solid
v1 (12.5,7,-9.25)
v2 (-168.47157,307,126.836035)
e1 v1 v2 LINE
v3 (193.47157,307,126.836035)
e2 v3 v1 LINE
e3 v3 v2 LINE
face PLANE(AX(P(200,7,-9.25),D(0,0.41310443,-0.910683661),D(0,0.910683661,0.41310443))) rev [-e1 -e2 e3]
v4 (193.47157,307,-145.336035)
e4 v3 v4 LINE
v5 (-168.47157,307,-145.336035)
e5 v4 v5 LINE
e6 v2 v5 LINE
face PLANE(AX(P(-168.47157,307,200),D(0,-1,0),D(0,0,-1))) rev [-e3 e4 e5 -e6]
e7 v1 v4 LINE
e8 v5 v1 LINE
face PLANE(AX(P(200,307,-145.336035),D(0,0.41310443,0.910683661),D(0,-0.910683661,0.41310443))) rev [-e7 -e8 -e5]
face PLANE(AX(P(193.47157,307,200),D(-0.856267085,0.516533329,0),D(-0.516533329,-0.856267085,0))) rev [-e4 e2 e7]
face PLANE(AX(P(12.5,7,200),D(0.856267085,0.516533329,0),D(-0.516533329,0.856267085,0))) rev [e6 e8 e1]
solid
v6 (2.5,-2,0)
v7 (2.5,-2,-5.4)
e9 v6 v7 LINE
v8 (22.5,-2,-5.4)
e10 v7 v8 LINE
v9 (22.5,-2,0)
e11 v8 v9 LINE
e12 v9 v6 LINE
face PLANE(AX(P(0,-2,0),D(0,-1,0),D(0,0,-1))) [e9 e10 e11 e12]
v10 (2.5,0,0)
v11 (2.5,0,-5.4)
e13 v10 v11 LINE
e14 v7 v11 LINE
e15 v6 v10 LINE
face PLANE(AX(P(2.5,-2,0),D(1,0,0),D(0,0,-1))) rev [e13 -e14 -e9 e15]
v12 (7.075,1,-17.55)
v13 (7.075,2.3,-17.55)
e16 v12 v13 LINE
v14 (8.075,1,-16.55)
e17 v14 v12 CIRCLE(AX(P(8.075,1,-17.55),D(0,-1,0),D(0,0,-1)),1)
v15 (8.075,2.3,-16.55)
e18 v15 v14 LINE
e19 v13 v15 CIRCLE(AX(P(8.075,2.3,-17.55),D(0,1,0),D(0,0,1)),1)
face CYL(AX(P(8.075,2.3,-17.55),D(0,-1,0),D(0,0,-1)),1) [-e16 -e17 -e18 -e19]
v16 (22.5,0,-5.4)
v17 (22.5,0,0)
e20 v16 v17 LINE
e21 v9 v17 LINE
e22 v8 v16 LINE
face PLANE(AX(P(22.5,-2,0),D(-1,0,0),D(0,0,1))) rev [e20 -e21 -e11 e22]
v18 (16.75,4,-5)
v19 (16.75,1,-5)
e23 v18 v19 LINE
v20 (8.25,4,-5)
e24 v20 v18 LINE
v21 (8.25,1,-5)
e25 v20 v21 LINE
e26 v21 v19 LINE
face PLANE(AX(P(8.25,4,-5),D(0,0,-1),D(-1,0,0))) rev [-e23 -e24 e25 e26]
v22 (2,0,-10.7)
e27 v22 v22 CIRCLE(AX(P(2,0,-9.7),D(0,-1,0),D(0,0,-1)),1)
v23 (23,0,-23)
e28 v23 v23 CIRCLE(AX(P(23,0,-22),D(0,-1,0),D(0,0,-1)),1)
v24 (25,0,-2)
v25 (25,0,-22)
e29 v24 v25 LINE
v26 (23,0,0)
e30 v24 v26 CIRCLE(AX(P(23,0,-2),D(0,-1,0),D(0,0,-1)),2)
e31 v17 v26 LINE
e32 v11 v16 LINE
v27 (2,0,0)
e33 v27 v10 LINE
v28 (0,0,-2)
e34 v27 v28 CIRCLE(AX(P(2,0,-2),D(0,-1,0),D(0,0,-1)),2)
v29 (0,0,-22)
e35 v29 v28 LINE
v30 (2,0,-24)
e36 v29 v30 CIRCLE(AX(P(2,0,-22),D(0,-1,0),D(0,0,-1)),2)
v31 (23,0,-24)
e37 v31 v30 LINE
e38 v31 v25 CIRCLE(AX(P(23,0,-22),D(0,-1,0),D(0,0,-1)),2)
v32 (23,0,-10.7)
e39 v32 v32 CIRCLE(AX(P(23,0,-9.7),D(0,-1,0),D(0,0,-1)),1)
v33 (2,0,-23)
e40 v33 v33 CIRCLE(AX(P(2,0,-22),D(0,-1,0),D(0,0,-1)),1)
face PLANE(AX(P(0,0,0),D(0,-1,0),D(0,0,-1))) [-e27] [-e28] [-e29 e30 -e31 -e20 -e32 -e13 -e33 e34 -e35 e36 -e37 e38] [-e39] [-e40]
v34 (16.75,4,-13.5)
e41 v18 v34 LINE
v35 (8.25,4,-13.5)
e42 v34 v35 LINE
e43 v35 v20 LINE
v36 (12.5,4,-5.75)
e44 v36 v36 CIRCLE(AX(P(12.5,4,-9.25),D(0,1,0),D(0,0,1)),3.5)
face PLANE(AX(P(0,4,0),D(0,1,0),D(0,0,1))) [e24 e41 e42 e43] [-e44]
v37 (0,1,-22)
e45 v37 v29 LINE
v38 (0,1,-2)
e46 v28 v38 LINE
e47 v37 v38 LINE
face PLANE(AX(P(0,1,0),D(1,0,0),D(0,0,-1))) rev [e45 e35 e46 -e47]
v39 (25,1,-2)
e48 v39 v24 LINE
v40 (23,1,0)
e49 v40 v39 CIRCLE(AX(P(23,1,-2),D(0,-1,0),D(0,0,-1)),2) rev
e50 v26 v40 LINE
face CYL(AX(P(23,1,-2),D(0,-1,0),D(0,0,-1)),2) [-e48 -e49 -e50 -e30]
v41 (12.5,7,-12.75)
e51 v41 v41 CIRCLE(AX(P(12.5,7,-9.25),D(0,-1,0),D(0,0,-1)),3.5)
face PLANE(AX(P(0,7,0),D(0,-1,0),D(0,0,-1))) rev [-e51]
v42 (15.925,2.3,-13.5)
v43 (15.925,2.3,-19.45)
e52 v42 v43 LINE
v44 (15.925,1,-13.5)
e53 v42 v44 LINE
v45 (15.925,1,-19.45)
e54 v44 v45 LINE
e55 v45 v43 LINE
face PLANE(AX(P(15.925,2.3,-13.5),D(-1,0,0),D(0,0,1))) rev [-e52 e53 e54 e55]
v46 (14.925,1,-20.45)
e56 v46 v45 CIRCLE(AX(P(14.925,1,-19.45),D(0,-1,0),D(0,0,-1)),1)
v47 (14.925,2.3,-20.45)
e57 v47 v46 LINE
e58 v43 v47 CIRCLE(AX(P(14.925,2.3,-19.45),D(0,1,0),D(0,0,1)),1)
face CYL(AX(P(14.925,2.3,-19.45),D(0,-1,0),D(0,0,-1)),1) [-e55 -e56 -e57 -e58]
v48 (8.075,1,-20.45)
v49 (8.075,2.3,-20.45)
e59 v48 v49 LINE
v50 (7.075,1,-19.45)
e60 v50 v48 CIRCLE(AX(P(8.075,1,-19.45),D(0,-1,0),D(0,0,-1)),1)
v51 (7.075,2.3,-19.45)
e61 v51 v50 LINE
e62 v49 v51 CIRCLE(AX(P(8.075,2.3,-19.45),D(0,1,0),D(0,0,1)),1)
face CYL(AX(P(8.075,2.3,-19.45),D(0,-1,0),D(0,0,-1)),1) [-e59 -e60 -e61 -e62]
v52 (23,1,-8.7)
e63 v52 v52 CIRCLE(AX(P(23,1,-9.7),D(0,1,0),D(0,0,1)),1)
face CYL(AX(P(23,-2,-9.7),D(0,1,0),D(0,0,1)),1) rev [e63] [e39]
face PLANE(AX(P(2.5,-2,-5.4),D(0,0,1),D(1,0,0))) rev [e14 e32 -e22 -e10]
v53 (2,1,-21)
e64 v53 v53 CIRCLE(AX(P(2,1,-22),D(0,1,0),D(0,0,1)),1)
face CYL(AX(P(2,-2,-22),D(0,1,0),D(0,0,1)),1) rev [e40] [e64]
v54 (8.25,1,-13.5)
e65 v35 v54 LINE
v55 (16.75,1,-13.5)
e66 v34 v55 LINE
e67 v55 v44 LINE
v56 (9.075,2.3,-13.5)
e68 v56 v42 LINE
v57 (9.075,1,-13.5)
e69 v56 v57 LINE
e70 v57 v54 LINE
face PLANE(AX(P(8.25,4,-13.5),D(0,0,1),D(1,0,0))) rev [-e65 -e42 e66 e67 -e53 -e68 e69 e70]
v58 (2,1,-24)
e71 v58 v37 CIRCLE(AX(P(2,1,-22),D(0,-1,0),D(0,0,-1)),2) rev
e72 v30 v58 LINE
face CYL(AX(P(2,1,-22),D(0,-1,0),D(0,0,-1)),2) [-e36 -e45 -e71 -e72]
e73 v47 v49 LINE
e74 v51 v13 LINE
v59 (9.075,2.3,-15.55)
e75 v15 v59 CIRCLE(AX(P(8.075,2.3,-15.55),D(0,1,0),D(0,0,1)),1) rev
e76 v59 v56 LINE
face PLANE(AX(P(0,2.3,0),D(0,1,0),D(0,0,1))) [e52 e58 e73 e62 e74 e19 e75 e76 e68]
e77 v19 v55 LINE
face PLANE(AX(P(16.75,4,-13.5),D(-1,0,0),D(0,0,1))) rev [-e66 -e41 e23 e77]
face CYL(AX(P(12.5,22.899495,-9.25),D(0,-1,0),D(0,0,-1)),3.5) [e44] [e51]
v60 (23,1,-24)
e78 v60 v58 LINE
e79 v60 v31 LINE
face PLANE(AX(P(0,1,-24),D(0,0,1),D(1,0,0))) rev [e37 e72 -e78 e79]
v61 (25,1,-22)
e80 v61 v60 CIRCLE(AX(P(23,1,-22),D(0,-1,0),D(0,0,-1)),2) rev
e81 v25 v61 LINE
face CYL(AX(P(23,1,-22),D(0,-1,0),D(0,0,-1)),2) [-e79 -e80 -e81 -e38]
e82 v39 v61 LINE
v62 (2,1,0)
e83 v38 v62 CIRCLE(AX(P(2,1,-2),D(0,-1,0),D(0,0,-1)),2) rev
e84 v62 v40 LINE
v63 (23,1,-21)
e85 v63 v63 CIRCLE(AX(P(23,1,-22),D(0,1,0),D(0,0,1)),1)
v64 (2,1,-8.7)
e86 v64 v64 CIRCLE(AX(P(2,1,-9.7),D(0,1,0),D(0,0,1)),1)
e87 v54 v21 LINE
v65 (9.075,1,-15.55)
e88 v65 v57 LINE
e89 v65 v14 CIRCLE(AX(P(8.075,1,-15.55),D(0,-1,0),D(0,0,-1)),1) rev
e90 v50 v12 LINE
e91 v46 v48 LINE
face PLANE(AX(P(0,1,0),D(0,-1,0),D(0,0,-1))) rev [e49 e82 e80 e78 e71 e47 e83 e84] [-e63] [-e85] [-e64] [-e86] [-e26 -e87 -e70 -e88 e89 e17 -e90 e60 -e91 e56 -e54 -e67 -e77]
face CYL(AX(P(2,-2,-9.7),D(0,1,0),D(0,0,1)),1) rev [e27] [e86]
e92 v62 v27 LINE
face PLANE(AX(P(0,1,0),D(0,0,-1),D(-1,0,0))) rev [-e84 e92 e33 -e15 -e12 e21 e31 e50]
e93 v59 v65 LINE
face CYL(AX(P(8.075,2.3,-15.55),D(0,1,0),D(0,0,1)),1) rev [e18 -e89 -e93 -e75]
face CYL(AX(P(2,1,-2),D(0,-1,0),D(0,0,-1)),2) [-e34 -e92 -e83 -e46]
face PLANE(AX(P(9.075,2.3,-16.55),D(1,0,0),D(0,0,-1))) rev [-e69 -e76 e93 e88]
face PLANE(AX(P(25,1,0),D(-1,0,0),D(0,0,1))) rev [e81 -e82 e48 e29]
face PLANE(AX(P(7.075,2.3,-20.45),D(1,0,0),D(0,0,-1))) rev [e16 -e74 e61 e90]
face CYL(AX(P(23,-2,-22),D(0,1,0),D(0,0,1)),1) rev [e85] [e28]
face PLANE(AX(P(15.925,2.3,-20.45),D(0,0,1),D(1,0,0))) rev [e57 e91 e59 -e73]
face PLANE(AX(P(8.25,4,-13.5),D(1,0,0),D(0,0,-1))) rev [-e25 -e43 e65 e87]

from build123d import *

# Parameters (mm, degrees)
SKETCH1_W           = 25
SKETCH1_H           = 24
BOSS_EXTRUDE1_DEPTH = 1
SKETCH2_W           = 8.5
SKETCH2_H           = 8.5
BOSS_EXTRUDE2_DEPTH = 3
SKETCH3_R           = 3.5
BOSS_EXTRUDE3_DEPTH = 3
SKETCH4_W           = 20
SKETCH4_H           = 5.4
BOSS_EXTRUDE4_DEPTH = 2
SKETCH5_R           = 1
CUT_EXTRUDE1_DEPTH  = 36.17101079
FILLET1_R           = 2
BOSS_EXTRUDE5_DEPTH = 200
BOSS_EXTRUDE6_DEPTH = 200
BOSS_EXTRUDE7_DEPTH = 1.3
FILLET2_R           = 1


with BuildPart() as part:
    # Sketch1 → Boss-Extrude1 (new body)
    with BuildSketch(Plane(origin=(0, 0, 0), x_dir=(1, 0, 0), z_dir=(0, 1, 0))):
        with Locations((12.5, 12)):
            Rectangle(SKETCH1_W, SKETCH1_H)
    extrude(amount=BOSS_EXTRUDE1_DEPTH)

    # Sketch2 → Boss-Extrude2 (add)
    with BuildSketch(Plane(origin=(0, 1, 0), x_dir=(1, 0, 0), z_dir=(0, 1, 0))):
        with Locations((12.5, 9.25)):
            Rectangle(SKETCH2_W, SKETCH2_H)
    extrude(amount=BOSS_EXTRUDE2_DEPTH)

    # Sketch3 → Boss-Extrude3 (add)
    with BuildSketch(Plane(origin=(0, 4, 0), x_dir=(1, 0, 0), z_dir=(0, 1, 0))):
        with Locations(Location((12.5, 9.25, 0), (0, 0, 90))):
            Circle(SKETCH3_R)
    extrude(amount=BOSS_EXTRUDE3_DEPTH)

    # Sketch4 → Boss-Extrude4 (add)
    with BuildSketch(Plane.XZ):
        with Locations((12.5, -2.7)):
            Rectangle(SKETCH4_W, SKETCH4_H)
    extrude(amount=BOSS_EXTRUDE4_DEPTH)

    # Sketch5 → Cut-Extrude1 (cut, through all)
    with BuildSketch(Plane(origin=(0, 1, 0), x_dir=(1, 0, 0), z_dir=(0, 1, 0))):
        with Locations(Location((2, 9.7, 0), (0, 0, 270))):
            Circle(SKETCH5_R)
        with Locations(Location((2, 22, 0), (0, 0, 270))):
            Circle(SKETCH5_R)
        with Locations(Location((23, 22, 0), (0, 0, 270))):
            Circle(SKETCH5_R)
        with Locations(Location((23, 9.7, 0), (0, 0, 270))):
            Circle(SKETCH5_R)
    extrude(amount=-CUT_EXTRUDE1_DEPTH, mode=Mode.SUBTRACT)

    # Fillet1
    fillet1_edges = [part.edges().sort_by_distance(p)[0] for p in [
        (0, 0.5, -24),
        (25, 0.5, -24),
        (25, 0.5, 0),
        (0, 0.5, 0),
    ]]
    fillet(fillet1_edges, radius=FILLET1_R)

    # Sketch9 → Boss-Extrude7 (add)
    with BuildSketch(Plane(origin=(0, 1, 0), x_dir=(1, 0, 0), z_dir=(0, 1, 0))):
        Polygon((15.925, 13.5), (15.925, 20.45), (7.075, 20.45), (7.075, 16.55), (9.075, 16.55), (9.075, 13.5), align=None)
    extrude(amount=BOSS_EXTRUDE7_DEPTH)

    # Fillet2
    fillet2_edges = [part.edges().sort_by_distance(p)[0] for p in [
        (9.075, 1.65, -16.55),
        (7.075, 1.65, -16.55),
        (15.925, 1.65, -20.45),
        (7.075, 1.65, -20.45),
    ]]
    fillet(fillet2_edges, radius=FILLET2_R - 0.0001)  # a hair under: the kernel refuses the full size


with BuildPart() as body_2:
    # Sketch6 → Boss-Extrude5 (new, symmetric)
    with BuildSketch(Plane(origin=(0, 0, 0), x_dir=(0, 0, -1), z_dir=(1, 0, 0))):
        Polygon((9.25, 7), (-126.836035449, 307), (145.336035449, 307), align=None)
    extrude(amount=BOSS_EXTRUDE5_DEPTH, both=True)


with BuildPart() as body_3:
    # Sketch8 → Boss-Extrude6 (new, symmetric)
    with BuildSketch(Plane.XY):
        Polygon((12.5, 7), (-168.471570024, 307), (193.471570024, 307), align=None)
    extrude(amount=BOSS_EXTRUDE6_DEPTH, both=True)

    # Intersect1: read off the stored shape, not the designer's step
    # Intersect1: intersect body 2
    add(body_2.part, mode=Mode.INTERSECT)


solid = Compound([part.part, body_3.part])
